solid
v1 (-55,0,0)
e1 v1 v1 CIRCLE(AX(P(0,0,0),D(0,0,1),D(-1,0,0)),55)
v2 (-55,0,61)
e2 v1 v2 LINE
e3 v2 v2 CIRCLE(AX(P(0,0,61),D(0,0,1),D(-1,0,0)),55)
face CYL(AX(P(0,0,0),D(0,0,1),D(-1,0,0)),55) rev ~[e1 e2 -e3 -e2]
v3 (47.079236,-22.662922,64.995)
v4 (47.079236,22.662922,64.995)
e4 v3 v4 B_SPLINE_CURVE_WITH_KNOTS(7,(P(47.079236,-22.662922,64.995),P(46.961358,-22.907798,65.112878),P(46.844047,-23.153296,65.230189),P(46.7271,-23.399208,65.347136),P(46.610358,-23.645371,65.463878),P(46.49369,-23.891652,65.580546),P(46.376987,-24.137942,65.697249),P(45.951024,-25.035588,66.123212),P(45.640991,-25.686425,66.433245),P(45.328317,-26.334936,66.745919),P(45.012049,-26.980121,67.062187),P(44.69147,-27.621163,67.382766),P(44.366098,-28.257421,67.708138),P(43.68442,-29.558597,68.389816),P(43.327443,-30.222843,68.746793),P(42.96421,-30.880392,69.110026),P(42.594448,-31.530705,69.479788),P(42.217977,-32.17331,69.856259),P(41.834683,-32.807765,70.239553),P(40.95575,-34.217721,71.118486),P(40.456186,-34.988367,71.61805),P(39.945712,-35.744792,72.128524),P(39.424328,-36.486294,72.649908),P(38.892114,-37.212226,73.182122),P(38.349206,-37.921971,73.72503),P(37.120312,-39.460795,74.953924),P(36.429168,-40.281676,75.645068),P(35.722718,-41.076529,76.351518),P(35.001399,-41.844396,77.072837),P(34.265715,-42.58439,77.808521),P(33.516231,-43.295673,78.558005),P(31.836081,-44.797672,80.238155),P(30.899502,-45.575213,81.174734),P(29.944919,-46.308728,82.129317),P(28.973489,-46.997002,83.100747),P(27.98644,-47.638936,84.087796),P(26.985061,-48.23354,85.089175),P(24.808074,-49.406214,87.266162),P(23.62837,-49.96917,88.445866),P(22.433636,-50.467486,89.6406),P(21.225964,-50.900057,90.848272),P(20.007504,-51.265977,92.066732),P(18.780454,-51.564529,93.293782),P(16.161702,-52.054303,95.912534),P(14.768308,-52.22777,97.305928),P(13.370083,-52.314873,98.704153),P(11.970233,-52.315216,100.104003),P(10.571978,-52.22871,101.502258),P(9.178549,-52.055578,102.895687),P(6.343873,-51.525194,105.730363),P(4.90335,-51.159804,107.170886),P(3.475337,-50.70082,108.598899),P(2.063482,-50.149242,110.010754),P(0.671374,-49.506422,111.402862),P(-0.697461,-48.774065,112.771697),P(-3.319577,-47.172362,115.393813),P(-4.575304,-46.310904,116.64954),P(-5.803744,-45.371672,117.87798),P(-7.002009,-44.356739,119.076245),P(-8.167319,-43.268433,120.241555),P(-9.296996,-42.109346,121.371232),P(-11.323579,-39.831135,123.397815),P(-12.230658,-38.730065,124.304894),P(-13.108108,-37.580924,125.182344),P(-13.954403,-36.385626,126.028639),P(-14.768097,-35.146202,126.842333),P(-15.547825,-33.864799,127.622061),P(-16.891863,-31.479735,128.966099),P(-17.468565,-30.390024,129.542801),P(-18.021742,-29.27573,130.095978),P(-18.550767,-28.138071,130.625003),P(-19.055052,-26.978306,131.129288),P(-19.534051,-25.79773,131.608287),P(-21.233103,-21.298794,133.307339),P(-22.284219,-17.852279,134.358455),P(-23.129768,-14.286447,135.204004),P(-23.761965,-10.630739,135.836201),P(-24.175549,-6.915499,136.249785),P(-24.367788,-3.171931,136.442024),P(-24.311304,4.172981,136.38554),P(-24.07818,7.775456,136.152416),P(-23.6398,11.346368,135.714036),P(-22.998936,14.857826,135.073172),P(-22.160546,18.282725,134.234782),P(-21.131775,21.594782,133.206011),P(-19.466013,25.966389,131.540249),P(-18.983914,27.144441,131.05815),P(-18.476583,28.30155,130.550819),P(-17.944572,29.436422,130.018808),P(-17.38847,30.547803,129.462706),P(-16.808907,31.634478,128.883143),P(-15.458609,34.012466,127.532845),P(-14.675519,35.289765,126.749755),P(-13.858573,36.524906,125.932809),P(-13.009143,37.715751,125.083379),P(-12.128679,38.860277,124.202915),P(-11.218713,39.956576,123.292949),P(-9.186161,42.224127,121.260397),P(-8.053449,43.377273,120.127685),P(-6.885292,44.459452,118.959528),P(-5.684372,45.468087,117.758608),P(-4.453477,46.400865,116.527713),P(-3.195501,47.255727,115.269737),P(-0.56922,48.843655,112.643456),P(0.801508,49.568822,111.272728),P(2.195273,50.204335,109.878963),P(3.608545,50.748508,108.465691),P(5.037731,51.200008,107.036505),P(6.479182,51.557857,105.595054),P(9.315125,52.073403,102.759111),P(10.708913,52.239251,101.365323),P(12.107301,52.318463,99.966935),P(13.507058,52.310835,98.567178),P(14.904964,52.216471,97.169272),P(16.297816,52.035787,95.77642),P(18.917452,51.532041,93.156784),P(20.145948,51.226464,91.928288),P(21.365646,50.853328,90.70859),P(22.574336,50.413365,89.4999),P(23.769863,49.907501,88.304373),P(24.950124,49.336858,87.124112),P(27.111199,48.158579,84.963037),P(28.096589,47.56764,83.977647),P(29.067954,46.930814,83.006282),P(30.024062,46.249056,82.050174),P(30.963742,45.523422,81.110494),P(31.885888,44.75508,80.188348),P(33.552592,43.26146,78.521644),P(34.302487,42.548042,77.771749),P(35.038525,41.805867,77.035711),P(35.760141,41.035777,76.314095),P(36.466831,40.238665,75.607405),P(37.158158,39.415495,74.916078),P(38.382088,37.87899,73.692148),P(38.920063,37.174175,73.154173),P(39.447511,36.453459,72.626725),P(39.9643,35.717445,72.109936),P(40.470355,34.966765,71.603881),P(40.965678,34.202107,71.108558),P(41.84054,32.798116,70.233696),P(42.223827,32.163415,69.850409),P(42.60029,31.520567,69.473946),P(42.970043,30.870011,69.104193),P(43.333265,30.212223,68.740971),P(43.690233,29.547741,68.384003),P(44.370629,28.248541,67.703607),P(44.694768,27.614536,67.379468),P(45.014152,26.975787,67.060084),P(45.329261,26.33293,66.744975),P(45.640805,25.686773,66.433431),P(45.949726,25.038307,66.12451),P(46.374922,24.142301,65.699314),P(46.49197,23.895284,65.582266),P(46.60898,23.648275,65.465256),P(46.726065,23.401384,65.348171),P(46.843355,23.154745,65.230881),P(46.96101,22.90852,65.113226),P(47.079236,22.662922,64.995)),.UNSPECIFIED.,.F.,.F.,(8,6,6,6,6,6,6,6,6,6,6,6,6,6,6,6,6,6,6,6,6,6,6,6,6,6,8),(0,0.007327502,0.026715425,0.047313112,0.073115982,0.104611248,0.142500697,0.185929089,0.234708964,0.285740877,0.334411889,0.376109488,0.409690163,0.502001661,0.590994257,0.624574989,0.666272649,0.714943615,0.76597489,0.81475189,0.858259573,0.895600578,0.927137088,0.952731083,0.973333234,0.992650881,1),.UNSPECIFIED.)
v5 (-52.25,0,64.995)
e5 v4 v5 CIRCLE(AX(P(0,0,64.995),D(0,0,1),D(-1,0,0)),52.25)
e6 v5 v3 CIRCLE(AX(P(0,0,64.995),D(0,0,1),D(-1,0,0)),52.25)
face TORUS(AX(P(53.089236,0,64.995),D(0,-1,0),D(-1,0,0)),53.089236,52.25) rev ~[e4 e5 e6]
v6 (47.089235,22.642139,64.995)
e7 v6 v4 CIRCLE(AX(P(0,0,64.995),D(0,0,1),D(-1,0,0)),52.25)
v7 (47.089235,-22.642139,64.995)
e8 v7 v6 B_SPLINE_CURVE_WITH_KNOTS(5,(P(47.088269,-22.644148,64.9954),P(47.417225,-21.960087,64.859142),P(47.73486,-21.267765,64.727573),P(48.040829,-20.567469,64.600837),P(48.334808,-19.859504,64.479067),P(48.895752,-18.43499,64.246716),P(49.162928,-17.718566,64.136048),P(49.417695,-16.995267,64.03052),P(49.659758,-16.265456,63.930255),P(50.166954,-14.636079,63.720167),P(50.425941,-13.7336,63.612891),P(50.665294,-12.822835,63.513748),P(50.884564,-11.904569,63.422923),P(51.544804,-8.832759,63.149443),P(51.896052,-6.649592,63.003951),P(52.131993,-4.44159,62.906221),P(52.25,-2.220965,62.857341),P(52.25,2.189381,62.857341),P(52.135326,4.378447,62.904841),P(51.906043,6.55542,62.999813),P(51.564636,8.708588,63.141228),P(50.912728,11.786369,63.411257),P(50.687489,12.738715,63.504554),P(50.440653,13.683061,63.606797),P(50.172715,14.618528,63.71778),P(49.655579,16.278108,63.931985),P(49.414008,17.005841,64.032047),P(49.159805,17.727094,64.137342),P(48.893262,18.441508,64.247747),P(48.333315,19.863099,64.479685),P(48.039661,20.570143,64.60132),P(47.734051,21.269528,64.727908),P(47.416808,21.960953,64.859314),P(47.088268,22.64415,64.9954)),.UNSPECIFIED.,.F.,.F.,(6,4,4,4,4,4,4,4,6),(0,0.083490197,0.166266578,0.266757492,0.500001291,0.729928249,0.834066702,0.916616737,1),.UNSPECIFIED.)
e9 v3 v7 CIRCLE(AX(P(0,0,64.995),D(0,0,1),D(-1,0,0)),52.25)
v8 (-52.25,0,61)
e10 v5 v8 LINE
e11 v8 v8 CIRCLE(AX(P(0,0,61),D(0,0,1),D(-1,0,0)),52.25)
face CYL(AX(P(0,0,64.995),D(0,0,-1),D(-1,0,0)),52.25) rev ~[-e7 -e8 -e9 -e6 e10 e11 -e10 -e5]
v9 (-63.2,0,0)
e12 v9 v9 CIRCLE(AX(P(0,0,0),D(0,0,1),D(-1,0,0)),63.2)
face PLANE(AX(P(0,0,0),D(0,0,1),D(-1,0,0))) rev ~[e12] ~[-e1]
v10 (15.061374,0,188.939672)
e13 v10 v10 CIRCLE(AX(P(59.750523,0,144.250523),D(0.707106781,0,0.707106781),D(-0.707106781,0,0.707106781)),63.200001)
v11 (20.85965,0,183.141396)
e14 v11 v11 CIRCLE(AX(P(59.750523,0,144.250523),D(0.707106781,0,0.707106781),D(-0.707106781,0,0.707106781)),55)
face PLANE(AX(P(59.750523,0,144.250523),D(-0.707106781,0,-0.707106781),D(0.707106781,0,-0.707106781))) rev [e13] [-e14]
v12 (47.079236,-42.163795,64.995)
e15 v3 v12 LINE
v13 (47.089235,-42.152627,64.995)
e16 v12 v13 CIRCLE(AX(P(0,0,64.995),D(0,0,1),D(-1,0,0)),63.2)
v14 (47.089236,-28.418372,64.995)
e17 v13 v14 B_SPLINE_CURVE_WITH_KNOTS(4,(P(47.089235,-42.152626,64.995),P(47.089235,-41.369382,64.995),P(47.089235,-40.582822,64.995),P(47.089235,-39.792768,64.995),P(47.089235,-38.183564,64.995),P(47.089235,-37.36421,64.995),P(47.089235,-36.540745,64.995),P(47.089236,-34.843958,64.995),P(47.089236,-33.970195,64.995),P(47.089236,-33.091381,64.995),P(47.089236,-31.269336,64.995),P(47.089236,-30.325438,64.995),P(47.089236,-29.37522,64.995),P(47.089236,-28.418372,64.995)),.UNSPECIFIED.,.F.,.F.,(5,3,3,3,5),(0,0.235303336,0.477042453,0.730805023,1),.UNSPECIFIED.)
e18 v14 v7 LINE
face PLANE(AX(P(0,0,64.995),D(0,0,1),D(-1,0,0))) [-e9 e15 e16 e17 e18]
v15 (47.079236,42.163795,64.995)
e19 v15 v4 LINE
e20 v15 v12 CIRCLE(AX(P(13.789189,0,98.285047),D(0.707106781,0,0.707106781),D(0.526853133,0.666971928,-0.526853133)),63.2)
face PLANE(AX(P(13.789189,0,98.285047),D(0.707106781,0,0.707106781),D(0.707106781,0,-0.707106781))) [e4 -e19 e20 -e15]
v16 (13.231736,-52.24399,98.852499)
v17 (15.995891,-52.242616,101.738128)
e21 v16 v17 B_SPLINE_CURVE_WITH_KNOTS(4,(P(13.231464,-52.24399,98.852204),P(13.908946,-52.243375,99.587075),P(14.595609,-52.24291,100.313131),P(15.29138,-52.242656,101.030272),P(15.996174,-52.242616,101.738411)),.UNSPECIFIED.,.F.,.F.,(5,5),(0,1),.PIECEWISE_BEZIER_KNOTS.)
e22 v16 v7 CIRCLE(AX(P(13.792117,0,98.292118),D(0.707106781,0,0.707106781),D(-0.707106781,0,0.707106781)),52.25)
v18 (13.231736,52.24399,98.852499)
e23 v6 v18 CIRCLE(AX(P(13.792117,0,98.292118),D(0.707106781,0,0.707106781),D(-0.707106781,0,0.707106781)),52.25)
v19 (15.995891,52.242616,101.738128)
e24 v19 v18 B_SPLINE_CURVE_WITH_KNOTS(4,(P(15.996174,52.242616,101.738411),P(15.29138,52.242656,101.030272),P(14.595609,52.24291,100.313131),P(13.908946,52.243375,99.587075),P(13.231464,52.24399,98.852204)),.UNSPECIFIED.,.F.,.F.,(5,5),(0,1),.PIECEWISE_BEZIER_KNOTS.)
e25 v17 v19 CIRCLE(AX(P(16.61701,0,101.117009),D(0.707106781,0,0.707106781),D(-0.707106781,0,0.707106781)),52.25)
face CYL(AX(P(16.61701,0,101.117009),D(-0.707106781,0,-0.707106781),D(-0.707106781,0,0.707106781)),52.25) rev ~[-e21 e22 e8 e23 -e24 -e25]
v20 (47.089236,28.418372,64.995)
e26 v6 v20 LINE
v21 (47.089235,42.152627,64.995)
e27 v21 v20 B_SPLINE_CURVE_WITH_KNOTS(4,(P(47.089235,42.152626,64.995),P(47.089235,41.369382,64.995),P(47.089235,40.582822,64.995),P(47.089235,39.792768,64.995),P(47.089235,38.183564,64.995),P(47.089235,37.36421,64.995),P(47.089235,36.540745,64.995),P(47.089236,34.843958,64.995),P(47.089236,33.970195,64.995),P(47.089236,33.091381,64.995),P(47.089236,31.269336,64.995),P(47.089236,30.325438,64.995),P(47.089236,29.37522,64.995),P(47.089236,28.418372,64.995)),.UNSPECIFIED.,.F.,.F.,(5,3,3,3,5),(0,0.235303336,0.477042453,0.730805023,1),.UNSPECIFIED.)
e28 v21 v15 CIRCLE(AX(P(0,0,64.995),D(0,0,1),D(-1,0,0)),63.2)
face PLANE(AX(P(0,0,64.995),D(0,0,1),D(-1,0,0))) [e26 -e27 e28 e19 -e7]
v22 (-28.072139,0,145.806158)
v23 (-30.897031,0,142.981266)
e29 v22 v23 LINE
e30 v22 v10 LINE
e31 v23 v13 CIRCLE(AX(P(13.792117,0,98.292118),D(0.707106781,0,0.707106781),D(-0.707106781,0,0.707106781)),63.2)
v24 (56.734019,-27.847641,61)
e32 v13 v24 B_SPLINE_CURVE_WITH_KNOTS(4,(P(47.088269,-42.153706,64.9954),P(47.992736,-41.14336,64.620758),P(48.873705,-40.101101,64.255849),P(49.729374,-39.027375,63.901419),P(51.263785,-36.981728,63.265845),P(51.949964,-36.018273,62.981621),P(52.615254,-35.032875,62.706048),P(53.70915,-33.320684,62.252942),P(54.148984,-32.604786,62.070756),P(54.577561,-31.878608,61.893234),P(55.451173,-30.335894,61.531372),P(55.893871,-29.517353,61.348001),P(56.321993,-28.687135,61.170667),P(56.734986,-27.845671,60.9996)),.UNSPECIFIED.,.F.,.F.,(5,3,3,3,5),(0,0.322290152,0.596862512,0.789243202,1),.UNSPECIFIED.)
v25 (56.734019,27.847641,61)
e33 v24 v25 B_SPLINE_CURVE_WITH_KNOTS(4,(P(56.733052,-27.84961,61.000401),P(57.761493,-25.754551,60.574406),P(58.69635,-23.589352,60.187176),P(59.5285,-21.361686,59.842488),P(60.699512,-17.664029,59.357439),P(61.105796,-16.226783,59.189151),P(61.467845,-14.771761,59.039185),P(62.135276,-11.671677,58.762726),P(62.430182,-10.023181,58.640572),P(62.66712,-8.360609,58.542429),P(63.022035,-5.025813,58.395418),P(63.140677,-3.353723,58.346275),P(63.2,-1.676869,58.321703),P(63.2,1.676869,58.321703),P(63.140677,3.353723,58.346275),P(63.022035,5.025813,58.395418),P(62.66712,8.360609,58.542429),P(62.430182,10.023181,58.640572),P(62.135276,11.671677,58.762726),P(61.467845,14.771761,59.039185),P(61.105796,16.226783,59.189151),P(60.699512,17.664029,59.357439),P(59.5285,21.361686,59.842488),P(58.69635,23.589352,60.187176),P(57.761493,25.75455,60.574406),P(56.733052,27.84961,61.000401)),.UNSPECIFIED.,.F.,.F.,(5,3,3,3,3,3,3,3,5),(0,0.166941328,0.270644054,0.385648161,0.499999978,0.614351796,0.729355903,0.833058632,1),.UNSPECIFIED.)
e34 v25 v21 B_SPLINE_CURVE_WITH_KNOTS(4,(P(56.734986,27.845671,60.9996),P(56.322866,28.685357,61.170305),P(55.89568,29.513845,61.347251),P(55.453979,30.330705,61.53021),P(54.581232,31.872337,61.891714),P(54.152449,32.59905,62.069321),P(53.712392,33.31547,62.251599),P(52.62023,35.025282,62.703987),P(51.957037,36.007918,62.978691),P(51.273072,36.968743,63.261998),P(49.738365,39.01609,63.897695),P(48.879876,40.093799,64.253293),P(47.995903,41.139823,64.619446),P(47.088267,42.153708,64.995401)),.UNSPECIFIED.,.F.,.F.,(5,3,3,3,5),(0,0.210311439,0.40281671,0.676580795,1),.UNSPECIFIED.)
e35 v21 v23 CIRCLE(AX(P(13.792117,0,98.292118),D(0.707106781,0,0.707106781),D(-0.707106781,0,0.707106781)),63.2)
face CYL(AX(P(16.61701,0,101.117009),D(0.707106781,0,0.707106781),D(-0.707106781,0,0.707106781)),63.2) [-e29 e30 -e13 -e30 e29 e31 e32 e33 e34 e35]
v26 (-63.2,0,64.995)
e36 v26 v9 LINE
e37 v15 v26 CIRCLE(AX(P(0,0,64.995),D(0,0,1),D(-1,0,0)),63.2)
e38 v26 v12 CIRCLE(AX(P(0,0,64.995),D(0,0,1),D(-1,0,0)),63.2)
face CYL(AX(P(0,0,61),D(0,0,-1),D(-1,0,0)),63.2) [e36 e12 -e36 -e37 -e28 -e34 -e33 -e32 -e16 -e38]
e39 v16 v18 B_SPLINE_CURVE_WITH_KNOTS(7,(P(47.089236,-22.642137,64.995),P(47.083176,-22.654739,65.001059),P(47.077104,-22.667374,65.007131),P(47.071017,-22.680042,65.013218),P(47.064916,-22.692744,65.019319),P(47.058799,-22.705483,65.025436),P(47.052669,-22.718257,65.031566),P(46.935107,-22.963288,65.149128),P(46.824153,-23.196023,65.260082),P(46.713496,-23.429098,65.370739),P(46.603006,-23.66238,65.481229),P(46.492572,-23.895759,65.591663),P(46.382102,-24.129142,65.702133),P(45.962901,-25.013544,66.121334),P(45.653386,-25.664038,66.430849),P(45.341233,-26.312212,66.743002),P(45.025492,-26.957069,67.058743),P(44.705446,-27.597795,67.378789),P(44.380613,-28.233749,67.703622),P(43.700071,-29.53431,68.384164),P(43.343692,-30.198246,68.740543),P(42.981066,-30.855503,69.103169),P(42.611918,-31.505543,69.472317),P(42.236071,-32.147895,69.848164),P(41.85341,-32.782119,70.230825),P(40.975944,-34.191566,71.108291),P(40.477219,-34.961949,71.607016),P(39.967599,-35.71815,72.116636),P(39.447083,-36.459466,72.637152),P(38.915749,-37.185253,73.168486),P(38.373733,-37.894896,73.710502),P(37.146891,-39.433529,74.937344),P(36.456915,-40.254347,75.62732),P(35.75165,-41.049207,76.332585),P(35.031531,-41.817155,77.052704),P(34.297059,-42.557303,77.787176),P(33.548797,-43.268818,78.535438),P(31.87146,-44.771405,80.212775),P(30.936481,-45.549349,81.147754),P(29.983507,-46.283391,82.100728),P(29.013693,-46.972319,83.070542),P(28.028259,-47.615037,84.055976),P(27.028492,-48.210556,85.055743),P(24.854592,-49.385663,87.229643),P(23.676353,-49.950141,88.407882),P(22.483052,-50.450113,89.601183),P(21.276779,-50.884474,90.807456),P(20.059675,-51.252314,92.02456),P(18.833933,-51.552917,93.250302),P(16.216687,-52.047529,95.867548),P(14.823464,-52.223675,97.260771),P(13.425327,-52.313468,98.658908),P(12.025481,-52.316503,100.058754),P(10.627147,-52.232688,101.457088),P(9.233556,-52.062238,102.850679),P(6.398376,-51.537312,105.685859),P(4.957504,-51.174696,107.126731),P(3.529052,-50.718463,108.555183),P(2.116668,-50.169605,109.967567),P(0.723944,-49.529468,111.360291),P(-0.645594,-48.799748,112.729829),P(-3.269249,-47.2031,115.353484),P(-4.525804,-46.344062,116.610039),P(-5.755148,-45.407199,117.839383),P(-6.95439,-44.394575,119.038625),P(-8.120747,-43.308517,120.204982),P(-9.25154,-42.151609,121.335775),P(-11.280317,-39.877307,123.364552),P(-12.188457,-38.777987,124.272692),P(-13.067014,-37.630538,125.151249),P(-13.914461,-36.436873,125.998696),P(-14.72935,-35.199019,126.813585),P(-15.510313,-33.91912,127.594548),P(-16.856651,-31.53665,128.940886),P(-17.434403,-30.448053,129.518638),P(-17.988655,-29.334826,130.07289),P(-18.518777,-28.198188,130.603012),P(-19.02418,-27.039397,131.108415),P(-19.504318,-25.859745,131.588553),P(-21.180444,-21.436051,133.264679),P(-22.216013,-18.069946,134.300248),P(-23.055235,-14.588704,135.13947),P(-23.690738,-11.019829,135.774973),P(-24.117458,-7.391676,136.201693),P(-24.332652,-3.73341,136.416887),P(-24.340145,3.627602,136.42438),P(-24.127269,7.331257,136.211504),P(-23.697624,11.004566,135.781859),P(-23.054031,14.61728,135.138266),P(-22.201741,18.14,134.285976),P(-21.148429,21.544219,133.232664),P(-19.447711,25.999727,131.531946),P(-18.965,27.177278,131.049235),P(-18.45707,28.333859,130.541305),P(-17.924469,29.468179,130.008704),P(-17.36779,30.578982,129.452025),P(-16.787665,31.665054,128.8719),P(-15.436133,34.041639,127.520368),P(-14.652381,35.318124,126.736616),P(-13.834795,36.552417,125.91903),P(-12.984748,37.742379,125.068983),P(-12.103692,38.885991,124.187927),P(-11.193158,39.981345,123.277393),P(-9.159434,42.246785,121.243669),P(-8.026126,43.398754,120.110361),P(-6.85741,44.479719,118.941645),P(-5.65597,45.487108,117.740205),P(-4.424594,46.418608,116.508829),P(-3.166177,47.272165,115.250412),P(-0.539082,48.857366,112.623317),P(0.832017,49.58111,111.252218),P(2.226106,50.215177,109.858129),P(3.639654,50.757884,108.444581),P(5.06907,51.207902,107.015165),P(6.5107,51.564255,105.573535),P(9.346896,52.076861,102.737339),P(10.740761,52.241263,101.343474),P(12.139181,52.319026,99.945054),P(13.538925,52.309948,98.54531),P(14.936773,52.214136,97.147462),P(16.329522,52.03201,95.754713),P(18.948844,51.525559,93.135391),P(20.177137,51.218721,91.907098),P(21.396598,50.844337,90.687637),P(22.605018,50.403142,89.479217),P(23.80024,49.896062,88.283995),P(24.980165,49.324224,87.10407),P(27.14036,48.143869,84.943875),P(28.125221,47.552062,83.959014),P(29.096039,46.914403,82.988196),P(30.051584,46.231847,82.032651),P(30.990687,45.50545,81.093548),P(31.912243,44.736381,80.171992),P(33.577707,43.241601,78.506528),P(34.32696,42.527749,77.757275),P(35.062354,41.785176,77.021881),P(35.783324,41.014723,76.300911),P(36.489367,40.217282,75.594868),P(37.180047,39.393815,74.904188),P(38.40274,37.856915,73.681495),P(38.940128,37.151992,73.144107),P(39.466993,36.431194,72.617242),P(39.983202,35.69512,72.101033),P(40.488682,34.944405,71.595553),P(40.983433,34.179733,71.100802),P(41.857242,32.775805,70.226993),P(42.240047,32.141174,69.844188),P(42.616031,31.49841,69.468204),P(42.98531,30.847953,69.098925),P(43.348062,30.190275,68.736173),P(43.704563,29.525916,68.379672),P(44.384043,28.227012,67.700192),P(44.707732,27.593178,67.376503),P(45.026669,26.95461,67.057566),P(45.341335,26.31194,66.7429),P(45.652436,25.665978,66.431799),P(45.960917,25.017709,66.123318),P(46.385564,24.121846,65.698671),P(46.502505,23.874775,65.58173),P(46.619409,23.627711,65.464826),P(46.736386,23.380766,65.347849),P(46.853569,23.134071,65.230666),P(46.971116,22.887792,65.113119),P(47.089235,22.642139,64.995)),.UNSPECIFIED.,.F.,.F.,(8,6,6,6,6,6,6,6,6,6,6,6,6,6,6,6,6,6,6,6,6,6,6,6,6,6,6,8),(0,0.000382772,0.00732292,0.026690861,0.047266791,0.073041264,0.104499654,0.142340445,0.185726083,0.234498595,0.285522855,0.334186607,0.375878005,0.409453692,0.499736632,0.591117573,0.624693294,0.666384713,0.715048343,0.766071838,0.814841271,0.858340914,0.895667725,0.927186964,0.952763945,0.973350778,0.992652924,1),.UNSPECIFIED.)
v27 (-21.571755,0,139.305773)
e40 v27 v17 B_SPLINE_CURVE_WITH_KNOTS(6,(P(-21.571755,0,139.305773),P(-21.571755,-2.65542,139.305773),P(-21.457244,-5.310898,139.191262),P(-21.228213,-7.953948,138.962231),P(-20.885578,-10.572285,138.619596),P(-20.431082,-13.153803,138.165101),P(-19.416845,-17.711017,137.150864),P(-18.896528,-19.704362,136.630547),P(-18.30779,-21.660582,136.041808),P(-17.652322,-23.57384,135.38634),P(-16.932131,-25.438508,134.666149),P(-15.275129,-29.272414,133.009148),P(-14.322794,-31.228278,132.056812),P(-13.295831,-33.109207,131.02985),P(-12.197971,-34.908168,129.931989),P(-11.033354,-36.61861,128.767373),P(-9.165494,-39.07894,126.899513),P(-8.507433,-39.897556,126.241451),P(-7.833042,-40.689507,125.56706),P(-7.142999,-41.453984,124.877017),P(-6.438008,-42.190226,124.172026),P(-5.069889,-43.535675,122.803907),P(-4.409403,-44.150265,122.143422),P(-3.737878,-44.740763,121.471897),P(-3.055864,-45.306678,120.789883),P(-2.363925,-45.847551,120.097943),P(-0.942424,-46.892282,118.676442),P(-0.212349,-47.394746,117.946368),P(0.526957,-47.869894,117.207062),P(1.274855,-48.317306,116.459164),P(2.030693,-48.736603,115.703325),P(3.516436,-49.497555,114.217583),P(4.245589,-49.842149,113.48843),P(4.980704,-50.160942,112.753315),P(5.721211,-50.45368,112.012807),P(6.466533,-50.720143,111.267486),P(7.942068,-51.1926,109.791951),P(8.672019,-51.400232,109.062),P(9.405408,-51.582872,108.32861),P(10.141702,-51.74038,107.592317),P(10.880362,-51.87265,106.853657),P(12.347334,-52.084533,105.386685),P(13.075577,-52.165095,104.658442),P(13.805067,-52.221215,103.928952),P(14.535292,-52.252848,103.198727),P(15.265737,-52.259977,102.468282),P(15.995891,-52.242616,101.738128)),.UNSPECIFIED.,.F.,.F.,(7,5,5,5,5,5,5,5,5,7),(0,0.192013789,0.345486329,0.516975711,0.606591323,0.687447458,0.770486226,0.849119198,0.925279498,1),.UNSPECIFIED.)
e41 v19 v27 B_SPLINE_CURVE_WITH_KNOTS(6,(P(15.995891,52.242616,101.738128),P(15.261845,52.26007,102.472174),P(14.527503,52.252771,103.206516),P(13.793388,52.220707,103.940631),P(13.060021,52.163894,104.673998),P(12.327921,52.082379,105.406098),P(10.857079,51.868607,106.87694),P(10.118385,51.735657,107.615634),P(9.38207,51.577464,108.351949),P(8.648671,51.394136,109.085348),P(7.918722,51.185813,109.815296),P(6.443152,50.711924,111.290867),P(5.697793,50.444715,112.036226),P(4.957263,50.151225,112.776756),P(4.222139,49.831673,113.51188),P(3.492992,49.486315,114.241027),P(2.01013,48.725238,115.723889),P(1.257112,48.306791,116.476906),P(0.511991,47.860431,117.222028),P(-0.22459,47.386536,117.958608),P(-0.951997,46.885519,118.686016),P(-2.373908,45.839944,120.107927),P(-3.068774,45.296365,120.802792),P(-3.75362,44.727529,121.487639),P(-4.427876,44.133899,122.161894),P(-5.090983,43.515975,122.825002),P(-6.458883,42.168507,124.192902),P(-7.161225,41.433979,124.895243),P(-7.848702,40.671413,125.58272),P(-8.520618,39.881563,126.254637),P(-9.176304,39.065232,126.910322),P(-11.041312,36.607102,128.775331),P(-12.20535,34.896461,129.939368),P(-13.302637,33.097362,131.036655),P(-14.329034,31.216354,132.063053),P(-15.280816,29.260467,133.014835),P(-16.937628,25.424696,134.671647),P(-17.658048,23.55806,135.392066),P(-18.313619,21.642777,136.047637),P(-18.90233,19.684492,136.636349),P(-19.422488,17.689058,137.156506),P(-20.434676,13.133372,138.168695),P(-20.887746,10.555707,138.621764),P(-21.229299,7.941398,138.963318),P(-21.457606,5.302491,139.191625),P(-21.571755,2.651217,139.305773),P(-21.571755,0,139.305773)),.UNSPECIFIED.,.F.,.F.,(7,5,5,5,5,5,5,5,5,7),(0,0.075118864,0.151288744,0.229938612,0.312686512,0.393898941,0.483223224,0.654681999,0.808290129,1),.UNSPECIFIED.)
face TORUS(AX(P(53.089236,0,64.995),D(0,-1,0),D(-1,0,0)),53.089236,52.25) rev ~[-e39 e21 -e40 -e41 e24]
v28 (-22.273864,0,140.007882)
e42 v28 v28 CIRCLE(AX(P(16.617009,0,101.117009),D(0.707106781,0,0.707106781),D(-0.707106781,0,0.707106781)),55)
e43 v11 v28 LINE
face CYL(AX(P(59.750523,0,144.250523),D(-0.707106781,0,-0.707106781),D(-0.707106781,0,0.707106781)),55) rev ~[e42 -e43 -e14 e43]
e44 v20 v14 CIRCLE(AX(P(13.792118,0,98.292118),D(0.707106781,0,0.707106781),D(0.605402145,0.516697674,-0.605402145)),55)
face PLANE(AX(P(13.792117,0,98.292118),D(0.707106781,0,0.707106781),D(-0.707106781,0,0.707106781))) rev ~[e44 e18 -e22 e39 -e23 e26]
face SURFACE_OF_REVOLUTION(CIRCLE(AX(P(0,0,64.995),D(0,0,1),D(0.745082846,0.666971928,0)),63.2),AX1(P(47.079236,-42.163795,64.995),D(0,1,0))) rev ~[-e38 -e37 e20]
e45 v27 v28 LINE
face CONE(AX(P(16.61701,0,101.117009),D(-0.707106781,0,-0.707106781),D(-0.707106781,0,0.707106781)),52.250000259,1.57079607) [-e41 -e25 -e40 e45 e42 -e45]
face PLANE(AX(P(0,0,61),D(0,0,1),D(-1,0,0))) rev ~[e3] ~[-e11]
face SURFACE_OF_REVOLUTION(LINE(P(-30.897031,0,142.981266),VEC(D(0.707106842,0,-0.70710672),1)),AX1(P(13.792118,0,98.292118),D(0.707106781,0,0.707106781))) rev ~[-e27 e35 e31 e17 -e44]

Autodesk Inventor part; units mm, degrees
ref_plane "YZ Plane" through (0, 0, 0) normal (1, 0, 0) x (0, 1, 0)
ref_plane "XZ Plane" through (0, 0, 0) normal (0, 1, 0) x (-1, 0, 0)
ref_plane "XY Plane" through (0, 0, 0) normal (0, 0, 1) x (1, 0, 0)
sketch "Sketch1" plane through (0, 0, 0) normal (0, 1, 0) x (-1, 0, 0)
  line L0 (0, 0) -> (0, 84.5) construction
  line L1 (0, 84.5) -> (-59.750523, 144.250523) construction
  line L2 (63.2, 0) -> (55, 0)
  line L3 (55, 0) -> (55, 61)
  line L4 (55, 61) -> (63.2, 61)
  line L5 (63.2, 61) -> (63.2, 0)
  line L6 (0, 0) -> (55, 0) construction
  line L7 (55, 61) -> (0, 61) construction
  line L8 (-20.85965, 183.141396) -> (22.273864, 140.007882)
  line L9 (22.273864, 140.007882) -> (28.072139, 145.806158)
  line L10 (28.072139, 145.806158) -> (-15.061374, 188.939672)
  line L11 (-15.061374, 188.939672) -> (-20.85965, 183.141396)
  line L12 (22.273864, 140.007882) -> (-16.617009, 101.117009) construction
  line L13 (-20.85965, 183.141396) -> (-59.750523, 144.250523) construction
  arc A0 (0, 61) -> (-16.617009, 101.117009) centre (-56.734019, 61) ccw
  line L14 (28.072139, 145.806158) -> (30.897031, 142.981266)
  line L15 (30.897031, 142.981266) -> (25.098755, 137.182991)
  line L16 (25.098755, 137.182991) -> (22.273864, 140.007882)
  line L17 (55, 61) -> (55, 64.995) construction
  line L18 (55, 64.995) -> (63.2, 64.995)
  line L19 (63.2, 64.995) -> (63.2, 61)
  line L20 (-15.061374, 188.939672) -> (-59.750523, 144.250523)
  line L21 (-15.061374, 188.939672) -> (30.897031, 142.981266)
  line L22 (30.897031, 142.981266) -> (-13.792118, 98.292118)
  line L23 (-13.792118, 98.292118) -> (-59.750523, 144.250523)
  line L24 (63.2, 64.995) -> (0, 64.995)
  line L25 (0, 64.995) -> (0, 0)
  line L26 (63.2, 0) -> (63.2, 64.995)
  line L27 (0, 0) -> (63.2, 0)
  line L28 (55, 61) -> (0, 61)
  line L29 (52.25, 64.995) -> (52.25, 61)
  line L30 (20.32932, 138.063339) -> (23.154212, 135.238447)
  line L31 (20.32932, 138.063339) -> (22.273864, 140.007882)
  dimension "d0" = 61
  dimension "d1" = 23.5
  dimension "d2" = 110
  dimension "d3" = 8.2
  dimension "d4" = 8.2
  dimension "d5" = 110
  dimension "d6" = 135
  dimension "d7" = 61
  dimension "d8" = 23.5
  dimension "d9" = 3.995
  dimension "d10" = 3.995
  dimension "d11" = 104.5
  dimension "d12" = 104.5
revolve "Revolution1" add sketch "Sketch1" angle 360 about axis through (0, 0, 84.5) along (0.7071068, 0, 0.7071068) contours L11 L10 L9 L8 | L8 L31 L30 L22 L23 L20 | L9 L14 L15 L16 | L16 L22 L30 L31
revolve "Revolution2" add sketch "Sketch1" angle 360 about axis through (0, 0, 0) along (0, 0, 1) contours L2 L3 L4 L5 | L27 L25 L28 L3 | L4 L28 L29 L24 L18 L19 | L28 L25 L24 L29
revolve "Revolution3" cut sketch "Sketch1" angle 360 about axis through (0, 0, 0) along (0, 0, 1) contours L27 L25 L28 L3 | L28 L25 L24 L29
revolve "Revolution4" cut sketch "Sketch1" angle 360 about axis through (0, 0, 84.5) along (0.7071068, 0, 0.7071068) contours L8 L31 L30 L22 L23 L20
sketch "Sketch2" plane through (0, 0, 64.995) normal (0, 0, 1) x (1, 0, 0)
  line L0 (47.089236, 42.152626) -> (47.089236, -42.152626)
  arc A0 (47.089236, 42.152626) -> (47.089236, -42.152626) centre (0, 0) ccw
  circle A1 centre (0, 0) radius 63.2
  circle A2 centre (0, 0) radius 52.25
  line L1 (47.079236, -42.163795) -> (47.079236, 42.163795)
  dimension "d13" = 104.5
  dimension "d14" = 126.4
  dimension "d15" = 0.01
revolve "Revolution5" add sketch "Sketch2" angle 45 about axis through (47.079236, -42.163795, 64.995) along (0, 1, 0) contours L1 A2 A0 | L1 A2
sketch "Sketch3" plane through (0, 0, 64.995) normal (0, 0, 1) x (1, 0, 0)
  circle A0 centre (0, 0) radius 52.25
  line L0 (47.089236, 42.152626) -> (47.089236, -42.152626)
  arc A1 (47.089236, 42.152626) -> (47.089236, -42.152626) centre (0, 0) ccw
  line L1 (53.089236, 110) -> (53.089236, -110)
  line L2 (-63.2, 0) -> (0, 0) construction
  point P0 (53.089236, 0)
  dimension "d17" = 6
  dimension "d18" = 220
revolve "Revolution6" cut sketch "Sketch3" angle 45 about axis through (53.089236, 110, 64.995) along (0, 1, 0) contours A0 L0 | L0 A0
equation "\"d0\" = t1"
equation "\"d1\" = z1"
equation "\"d2\" = dd1"
equation "\"d3\" = s1"
equation "\"d4\" = s1"
equation "\"d5\" = dd1"
equation "\"d7\" = t1"
equation "\"d8\" = z1"
equation "\"z1\" = 23.5"
equation "\"t1\" = 61"
equation "\"s1\" = 8.2"
equation "\"dd1\" = 110"
equation "\"X\" = 0.01"
equation "\"Y\" = 6"
properties part number "DIN 8063 Изгиб 45 градусов, тип W2 110" material "ПВХ, непластифицированный"
